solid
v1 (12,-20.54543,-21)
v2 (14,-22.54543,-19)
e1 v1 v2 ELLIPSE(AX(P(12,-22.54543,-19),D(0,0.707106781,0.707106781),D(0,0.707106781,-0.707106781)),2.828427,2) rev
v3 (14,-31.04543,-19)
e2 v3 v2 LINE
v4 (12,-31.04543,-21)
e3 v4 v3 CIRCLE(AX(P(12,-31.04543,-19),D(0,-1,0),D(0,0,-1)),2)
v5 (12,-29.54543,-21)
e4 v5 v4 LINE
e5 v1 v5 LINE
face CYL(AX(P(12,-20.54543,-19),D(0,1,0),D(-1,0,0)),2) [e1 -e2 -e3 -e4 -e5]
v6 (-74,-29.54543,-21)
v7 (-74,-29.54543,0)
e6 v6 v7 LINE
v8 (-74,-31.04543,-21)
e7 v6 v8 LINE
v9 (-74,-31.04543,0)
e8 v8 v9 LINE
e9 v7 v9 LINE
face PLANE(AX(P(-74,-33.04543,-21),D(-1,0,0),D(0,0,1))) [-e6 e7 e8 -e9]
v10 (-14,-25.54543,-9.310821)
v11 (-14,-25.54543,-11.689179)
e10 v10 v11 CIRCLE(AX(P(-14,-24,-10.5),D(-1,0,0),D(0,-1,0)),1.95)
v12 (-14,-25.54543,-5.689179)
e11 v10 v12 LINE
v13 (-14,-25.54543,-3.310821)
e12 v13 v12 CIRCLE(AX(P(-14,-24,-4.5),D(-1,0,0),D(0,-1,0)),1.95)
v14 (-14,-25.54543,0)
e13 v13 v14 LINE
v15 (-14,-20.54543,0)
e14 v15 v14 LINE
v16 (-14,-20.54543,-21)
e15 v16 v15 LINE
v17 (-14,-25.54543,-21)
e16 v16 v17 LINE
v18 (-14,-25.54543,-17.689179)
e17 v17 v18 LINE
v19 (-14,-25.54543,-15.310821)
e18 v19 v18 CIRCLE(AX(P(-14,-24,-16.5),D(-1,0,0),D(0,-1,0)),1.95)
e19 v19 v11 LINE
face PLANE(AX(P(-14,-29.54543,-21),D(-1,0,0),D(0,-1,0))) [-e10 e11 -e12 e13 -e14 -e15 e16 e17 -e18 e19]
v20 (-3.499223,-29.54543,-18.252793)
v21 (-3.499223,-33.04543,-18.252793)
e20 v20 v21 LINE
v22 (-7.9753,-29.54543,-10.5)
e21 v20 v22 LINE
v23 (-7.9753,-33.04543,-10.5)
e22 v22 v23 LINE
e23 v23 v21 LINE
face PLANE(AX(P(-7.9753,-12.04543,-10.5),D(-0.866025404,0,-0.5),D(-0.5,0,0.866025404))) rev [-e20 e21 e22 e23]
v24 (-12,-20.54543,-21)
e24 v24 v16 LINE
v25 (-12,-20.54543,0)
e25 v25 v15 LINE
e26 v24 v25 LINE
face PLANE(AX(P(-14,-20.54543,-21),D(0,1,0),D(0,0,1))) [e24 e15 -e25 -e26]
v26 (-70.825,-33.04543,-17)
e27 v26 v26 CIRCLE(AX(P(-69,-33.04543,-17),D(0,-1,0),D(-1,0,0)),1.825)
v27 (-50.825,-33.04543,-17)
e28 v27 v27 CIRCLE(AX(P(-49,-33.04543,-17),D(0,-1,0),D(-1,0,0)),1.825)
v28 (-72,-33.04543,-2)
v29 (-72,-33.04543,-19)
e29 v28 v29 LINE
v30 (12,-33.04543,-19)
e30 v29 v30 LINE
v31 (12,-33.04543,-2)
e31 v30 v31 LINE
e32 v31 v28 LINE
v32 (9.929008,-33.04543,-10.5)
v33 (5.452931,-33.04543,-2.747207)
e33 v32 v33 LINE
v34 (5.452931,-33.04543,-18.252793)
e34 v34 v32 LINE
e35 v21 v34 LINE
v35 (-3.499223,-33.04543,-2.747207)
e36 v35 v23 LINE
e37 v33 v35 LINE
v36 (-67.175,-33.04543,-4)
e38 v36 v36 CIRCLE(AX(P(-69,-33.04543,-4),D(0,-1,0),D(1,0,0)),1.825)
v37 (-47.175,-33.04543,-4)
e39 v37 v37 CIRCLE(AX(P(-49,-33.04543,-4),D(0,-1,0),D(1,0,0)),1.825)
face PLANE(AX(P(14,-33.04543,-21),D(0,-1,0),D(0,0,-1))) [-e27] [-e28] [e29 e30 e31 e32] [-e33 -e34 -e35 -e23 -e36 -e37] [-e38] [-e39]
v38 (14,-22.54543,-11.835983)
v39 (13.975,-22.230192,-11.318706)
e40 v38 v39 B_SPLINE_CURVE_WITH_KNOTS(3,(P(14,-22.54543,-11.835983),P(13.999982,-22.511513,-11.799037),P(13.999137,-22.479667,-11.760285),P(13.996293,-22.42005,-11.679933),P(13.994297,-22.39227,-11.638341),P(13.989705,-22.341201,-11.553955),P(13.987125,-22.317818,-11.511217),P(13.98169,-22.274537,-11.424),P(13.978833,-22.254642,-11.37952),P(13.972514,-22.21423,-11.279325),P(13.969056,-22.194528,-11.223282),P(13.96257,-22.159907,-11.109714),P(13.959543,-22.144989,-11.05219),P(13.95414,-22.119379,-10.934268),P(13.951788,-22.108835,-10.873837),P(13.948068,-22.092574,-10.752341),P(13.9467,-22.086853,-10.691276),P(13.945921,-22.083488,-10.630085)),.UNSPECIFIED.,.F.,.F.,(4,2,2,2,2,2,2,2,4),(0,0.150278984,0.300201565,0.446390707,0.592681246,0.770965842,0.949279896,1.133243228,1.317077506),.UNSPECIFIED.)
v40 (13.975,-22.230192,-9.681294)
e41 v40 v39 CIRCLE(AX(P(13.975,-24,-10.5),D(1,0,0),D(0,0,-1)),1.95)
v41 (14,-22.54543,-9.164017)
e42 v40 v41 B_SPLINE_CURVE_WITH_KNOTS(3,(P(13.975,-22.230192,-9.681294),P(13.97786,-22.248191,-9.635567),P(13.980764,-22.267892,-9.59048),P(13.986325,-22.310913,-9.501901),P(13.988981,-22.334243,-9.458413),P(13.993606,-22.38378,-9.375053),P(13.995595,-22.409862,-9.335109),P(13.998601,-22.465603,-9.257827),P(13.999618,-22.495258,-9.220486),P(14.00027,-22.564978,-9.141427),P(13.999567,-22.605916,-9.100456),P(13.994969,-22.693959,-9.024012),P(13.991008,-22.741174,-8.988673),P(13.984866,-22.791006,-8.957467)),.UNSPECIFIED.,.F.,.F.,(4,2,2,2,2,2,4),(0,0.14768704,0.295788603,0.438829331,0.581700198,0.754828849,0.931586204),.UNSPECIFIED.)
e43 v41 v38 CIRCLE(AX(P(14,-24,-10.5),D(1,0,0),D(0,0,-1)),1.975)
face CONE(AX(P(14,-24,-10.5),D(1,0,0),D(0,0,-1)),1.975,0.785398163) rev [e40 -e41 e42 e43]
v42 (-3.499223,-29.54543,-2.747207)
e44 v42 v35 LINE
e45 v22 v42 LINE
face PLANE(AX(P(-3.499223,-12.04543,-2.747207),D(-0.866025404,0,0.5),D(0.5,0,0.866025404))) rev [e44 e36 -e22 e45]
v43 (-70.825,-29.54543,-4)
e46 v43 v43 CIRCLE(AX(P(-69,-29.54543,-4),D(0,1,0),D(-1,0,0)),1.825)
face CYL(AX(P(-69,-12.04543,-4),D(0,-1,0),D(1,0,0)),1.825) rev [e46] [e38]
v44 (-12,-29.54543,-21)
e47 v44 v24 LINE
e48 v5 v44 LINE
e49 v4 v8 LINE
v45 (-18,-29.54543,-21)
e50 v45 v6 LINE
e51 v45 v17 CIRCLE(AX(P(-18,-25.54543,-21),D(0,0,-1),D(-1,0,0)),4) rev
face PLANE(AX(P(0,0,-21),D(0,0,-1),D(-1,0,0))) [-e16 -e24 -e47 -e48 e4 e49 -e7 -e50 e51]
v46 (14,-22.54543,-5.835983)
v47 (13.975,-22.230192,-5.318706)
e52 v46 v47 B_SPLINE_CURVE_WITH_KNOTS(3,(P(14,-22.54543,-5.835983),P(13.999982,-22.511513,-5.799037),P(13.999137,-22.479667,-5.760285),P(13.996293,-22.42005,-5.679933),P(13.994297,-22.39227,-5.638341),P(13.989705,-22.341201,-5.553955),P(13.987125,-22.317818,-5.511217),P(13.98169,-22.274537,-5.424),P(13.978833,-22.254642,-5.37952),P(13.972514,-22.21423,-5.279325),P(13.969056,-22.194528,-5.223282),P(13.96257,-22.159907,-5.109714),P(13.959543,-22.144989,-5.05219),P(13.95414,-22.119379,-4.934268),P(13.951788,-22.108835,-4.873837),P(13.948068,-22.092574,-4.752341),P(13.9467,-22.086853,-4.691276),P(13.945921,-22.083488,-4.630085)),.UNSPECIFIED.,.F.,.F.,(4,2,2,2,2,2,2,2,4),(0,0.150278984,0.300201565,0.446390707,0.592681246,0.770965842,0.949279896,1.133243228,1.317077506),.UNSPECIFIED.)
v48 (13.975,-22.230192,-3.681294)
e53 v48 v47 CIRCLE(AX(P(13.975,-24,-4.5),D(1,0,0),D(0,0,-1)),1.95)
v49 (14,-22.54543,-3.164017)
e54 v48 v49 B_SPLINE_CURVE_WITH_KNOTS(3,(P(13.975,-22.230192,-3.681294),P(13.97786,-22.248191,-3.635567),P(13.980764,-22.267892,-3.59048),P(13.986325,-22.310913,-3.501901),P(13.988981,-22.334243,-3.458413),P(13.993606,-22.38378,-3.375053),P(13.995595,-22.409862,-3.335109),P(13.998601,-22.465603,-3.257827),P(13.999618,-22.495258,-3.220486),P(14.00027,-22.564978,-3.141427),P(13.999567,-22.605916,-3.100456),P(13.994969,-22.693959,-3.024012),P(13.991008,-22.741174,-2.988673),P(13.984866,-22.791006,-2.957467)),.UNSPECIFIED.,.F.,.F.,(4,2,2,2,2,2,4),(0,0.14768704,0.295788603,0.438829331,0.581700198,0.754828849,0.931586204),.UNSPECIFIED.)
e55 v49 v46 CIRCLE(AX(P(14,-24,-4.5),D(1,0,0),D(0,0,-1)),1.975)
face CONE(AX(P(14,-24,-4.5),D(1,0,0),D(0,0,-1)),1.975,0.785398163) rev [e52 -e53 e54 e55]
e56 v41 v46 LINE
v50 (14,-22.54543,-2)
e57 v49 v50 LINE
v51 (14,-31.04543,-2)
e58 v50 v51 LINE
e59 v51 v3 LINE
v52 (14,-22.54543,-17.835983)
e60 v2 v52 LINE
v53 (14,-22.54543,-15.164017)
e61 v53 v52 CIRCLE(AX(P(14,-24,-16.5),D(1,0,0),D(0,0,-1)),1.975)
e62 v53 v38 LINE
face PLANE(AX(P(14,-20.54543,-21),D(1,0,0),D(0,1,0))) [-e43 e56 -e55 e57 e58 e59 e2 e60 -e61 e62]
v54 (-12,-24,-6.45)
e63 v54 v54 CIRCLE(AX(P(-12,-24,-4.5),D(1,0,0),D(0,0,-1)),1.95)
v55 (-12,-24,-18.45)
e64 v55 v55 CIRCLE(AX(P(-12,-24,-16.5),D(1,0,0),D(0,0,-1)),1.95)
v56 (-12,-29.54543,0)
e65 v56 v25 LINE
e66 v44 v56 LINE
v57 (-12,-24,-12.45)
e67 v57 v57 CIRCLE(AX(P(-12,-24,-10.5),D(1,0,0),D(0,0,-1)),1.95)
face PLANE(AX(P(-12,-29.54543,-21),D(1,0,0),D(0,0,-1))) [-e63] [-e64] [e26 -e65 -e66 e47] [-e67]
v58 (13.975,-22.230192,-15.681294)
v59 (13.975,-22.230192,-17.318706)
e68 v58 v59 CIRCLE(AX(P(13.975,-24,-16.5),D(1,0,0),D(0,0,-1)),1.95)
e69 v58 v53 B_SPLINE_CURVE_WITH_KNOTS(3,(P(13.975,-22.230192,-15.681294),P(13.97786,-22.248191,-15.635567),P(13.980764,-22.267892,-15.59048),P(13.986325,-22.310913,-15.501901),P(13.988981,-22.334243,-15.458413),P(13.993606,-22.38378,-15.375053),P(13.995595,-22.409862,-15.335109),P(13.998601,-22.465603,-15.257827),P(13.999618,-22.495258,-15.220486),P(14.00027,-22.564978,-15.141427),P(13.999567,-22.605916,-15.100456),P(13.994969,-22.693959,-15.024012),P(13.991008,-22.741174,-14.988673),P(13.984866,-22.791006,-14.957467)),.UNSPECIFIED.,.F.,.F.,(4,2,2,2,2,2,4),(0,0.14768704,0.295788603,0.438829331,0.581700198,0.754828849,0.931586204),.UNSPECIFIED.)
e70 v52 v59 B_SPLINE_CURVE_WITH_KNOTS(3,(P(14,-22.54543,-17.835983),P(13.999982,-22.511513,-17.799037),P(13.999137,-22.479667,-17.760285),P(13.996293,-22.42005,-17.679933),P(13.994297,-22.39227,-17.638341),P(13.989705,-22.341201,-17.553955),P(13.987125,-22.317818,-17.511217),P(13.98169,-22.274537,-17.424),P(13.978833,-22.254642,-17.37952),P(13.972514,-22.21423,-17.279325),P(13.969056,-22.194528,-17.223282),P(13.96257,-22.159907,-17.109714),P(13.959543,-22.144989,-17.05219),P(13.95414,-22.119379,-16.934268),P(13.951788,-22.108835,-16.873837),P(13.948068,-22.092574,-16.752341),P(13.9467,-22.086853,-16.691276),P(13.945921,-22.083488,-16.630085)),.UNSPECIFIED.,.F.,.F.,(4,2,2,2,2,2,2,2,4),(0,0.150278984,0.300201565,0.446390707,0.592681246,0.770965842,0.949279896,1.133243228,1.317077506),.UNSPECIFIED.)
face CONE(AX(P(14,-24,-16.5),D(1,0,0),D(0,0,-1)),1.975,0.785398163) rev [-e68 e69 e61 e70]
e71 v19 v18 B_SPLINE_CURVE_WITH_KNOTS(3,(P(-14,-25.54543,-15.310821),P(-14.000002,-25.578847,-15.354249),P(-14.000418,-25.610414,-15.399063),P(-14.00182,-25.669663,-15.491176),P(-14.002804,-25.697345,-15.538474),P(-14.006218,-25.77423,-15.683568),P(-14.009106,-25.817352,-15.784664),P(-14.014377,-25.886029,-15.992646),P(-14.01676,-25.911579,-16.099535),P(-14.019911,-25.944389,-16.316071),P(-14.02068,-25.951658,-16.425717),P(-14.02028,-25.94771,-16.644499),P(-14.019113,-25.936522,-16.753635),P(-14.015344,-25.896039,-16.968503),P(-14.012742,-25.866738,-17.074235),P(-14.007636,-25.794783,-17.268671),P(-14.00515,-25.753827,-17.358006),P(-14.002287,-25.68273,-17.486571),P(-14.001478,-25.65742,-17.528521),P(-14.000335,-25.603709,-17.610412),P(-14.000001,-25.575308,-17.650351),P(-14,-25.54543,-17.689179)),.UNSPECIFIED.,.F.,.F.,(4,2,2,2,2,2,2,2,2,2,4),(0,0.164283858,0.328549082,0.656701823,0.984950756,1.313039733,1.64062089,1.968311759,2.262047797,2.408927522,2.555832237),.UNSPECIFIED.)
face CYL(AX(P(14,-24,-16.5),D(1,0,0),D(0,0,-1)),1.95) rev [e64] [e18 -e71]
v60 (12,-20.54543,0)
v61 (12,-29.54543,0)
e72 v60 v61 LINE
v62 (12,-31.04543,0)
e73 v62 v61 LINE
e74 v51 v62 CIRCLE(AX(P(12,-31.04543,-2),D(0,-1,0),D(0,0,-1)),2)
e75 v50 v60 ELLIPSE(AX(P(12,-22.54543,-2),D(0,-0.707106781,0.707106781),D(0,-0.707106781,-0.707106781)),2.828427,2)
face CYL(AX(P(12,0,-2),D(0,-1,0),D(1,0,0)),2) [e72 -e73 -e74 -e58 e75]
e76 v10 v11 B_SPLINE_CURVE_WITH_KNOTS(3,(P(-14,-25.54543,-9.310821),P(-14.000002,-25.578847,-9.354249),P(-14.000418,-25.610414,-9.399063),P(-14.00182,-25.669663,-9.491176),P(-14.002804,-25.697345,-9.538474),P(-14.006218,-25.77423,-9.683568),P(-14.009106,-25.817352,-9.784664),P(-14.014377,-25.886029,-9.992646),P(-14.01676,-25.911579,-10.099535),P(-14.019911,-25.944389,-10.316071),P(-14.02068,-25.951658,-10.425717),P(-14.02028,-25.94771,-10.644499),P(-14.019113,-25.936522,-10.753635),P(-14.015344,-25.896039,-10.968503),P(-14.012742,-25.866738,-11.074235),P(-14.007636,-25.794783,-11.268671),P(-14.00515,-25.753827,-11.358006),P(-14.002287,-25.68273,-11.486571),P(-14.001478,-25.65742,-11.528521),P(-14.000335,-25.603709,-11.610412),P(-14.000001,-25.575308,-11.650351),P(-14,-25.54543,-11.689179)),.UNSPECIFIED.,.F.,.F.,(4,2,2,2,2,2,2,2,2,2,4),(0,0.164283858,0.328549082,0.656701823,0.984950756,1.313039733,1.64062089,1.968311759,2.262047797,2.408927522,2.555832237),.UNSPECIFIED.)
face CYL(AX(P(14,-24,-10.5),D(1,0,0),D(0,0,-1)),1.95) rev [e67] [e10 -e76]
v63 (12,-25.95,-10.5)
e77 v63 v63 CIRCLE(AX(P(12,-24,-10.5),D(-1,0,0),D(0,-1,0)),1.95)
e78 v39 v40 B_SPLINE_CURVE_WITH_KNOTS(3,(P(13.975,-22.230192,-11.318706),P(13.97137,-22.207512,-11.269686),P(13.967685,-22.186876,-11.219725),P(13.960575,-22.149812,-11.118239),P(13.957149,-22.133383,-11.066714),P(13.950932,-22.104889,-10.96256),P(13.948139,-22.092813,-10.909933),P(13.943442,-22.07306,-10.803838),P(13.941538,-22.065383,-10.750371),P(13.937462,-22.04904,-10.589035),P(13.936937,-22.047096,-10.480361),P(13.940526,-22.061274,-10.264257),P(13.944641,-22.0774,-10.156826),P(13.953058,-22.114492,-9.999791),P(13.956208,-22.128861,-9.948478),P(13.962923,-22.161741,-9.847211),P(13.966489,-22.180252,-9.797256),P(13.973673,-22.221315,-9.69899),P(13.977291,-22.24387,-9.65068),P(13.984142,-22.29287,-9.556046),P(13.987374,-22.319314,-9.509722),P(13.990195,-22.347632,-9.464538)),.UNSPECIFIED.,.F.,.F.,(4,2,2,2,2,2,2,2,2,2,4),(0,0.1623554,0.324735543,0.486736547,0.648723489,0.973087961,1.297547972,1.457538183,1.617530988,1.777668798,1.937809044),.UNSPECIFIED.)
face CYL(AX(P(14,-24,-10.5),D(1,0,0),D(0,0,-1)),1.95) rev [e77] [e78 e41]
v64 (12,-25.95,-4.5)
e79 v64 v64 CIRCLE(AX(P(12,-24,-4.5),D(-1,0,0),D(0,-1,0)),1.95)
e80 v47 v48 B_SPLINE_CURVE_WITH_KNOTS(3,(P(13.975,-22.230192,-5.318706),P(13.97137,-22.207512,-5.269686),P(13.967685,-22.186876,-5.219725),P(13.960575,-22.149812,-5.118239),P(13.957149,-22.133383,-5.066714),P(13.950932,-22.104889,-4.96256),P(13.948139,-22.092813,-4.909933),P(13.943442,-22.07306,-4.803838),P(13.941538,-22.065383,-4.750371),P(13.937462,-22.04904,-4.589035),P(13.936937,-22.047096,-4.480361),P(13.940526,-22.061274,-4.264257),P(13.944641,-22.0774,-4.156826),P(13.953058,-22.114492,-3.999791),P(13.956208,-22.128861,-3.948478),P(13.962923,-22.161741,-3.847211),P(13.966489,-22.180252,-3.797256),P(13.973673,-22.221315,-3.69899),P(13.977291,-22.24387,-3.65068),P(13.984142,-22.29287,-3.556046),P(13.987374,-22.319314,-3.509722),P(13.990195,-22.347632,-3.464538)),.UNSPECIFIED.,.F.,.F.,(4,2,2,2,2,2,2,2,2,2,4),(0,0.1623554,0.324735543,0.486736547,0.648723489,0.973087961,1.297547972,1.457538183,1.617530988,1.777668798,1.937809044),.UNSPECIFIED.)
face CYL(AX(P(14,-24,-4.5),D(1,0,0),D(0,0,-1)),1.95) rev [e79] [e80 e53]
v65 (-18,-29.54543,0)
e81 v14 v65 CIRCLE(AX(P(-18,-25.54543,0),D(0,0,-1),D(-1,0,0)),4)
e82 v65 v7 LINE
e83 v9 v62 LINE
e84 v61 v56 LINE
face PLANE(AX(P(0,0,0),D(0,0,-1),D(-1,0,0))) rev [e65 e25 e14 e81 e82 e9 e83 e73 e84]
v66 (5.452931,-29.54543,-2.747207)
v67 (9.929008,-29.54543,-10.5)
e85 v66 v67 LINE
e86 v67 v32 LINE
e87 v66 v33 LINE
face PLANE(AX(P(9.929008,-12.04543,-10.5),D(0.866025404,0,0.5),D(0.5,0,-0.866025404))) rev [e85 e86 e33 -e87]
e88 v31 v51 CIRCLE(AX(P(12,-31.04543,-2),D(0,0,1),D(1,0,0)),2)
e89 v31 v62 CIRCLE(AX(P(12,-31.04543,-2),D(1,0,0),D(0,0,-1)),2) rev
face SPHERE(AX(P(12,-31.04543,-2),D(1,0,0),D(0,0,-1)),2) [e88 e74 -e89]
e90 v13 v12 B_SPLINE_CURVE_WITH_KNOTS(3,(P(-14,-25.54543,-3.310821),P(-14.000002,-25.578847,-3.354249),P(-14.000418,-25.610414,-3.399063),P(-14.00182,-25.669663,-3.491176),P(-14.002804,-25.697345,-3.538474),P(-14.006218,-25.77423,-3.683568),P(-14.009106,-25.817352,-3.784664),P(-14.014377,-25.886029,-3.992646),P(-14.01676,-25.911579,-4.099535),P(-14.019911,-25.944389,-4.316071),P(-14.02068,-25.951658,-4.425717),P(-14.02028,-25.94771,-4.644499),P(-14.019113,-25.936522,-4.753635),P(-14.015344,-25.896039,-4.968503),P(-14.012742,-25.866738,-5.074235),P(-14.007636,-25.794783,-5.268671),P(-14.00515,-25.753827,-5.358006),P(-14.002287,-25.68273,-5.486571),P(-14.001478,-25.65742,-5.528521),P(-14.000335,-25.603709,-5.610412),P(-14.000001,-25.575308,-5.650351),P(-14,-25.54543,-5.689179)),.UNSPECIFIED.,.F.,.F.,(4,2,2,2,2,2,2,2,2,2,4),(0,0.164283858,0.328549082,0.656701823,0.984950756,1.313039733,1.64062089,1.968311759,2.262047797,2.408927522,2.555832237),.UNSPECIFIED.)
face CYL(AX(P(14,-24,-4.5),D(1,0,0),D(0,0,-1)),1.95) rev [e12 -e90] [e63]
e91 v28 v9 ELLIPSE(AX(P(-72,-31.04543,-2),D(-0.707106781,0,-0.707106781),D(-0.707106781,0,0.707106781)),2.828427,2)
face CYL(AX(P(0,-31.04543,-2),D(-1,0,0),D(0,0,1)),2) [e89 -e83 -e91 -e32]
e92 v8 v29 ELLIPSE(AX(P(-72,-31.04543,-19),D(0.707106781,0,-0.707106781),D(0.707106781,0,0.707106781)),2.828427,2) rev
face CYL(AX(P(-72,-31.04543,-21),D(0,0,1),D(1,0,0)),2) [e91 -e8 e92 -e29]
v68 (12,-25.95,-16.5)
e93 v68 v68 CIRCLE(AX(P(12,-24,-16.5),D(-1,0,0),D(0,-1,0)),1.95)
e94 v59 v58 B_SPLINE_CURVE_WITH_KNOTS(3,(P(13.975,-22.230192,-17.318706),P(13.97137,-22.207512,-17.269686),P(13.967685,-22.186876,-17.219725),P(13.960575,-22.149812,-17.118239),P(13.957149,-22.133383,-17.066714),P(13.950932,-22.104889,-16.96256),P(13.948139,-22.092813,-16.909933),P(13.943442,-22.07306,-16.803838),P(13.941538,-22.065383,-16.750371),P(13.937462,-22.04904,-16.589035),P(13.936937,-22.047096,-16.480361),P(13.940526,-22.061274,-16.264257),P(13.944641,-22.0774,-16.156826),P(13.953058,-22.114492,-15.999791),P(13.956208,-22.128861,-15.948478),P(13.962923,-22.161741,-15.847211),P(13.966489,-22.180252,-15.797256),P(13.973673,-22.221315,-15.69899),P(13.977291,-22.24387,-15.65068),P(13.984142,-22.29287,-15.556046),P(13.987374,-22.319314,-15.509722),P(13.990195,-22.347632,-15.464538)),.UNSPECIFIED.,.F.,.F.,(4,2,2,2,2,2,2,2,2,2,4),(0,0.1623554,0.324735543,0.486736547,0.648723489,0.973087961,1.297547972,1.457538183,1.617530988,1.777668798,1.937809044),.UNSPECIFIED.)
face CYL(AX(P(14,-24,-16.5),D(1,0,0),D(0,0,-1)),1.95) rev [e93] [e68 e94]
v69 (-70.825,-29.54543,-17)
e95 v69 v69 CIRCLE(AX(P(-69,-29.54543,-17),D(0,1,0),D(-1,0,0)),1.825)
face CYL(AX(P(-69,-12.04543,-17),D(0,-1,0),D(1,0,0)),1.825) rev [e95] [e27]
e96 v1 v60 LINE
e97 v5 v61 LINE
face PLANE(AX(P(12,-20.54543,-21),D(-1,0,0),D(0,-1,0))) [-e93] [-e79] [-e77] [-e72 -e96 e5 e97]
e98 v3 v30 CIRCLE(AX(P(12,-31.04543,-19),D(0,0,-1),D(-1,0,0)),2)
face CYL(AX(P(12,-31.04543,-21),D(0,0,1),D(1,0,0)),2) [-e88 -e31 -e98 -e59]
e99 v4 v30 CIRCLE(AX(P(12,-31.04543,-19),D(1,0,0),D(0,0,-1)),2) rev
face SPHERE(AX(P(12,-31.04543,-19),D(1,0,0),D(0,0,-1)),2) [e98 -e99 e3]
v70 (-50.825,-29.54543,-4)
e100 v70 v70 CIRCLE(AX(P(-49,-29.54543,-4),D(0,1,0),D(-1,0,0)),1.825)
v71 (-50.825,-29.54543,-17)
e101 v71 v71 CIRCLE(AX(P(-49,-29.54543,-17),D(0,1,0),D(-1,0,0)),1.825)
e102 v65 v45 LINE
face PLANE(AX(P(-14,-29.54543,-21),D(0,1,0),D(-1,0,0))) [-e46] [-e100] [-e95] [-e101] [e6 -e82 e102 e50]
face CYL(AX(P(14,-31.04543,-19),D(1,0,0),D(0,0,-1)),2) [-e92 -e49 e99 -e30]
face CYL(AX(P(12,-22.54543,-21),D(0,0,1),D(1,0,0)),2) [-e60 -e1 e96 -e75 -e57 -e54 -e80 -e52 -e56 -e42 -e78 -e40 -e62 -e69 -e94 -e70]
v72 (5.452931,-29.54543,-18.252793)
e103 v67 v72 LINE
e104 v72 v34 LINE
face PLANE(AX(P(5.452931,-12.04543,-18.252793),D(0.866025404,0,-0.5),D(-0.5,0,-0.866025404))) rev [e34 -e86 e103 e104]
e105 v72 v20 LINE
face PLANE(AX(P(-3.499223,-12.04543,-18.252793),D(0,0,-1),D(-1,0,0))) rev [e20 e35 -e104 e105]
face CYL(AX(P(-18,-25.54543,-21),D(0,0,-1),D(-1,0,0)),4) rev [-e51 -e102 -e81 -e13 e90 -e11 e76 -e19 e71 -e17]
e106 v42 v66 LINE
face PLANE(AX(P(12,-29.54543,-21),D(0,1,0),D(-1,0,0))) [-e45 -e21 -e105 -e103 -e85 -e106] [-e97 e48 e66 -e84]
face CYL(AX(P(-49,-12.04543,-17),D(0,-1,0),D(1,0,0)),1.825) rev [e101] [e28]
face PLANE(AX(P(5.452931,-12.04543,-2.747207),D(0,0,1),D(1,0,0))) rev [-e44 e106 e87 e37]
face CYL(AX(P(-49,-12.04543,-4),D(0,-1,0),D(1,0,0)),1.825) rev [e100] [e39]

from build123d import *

# Parameters (mm, degrees)
BOSS_EXTRUDE1_DEPTH              = 21
FILLET1_R                        = 4
M3_5_CLEARANCE_HOLE1_D           = 3.9
M3_5_CLEARANCE_HOLE1_CSINK_D     = 3.95
M3_5_CLEARANCE_HOLE1_CSINK_ANGLE = 90
SKETCH4_R                        = 1.825
CUT_EXTRUDE1_DEPTH               = 21
FILLET3_R                        = 2


with BuildPart() as part:
    # Sketch1 → Boss-Extrude1 (new body)
    with BuildSketch(Plane.XY):
        Polygon((12, -20.545429918), (14, -20.545429918), (14, -33.045429918), (-74, -33.045429918), (-74, -29.545429918), (-14, -29.545429918), (-14, -20.545429918), (-12, -20.545429918), (-12, -29.545429918), (12, -29.545429918), align=None)
    extrude(amount=-BOSS_EXTRUDE1_DEPTH)

    # Fillet1
    fillet1_edges = [part.edges().sort_by_distance(p)[0] for p in [
        (-14, -29.545429918, -10.5),
    ]]
    fillet(fillet1_edges, radius=FILLET1_R)

    # M3.5 Clearance Hole1 (through all)
    with Locations(Plane(origin=(14, 0, 0), x_dir=(0, 0, -1), z_dir=(1, 0, 0))):
        with Locations((4.5, -24), (10.5, -24), (16.5, -24)):
            CounterSinkHole(M3_5_CLEARANCE_HOLE1_D / 2, M3_5_CLEARANCE_HOLE1_CSINK_D / 2, counter_sink_angle=M3_5_CLEARANCE_HOLE1_CSINK_ANGLE)

    # Sketch4 → Cut-Extrude1 (cut)
    with BuildSketch(Plane.XZ.offset(33.045429918)):
        with Locations((-69, -4)):
            Circle(SKETCH4_R)
        with Locations((-49, -4)):
            Circle(SKETCH4_R)
        with Locations((18.166214484, -42.778432013)):
            Circle(SKETCH4_R)
        with Locations((28.166214484, -60.098940088)):
            Circle(SKETCH4_R)
        with Locations(Location((-69, -17, 0), (0, 0, 180))):
            Circle(SKETCH4_R)
        with Locations(Location((-49, -17, 0), (0, 0, 180))):
            Circle(SKETCH4_R)
        Polygon((-3.49922334, -18.252792933), (5.452930834, -18.252792933), (9.929007921, -10.5), (5.452930834, -2.747207067), (-3.49922334, -2.747207067), (-7.975300427, -10.5), align=None)
    extrude(amount=-CUT_EXTRUDE1_DEPTH, mode=Mode.SUBTRACT)

    # Fillet3
    # the kernel refuses this fillet: 2 mm, written as the material it takes off along each edge
    with BuildSketch(Plane(origin=(12, -31.045429918, -19), x_dir=(0, 0, -1), z_dir=(0, -1, 0))) as fillet3_piece_1_section:
        Polygon((0, 0), (FILLET3_R, 0), (FILLET3_R, FILLET3_R), (0, FILLET3_R), align=None)
    fillet3_piece_1 = extrude(amount=FILLET3_R, mode=Mode.PRIVATE)
    fillet3_piece_1 = fillet3_piece_1 - Plane(origin=(12, -31.045429918, -19), x_dir=(-0.7071067811865475, 0, 0.7071067811865475), z_dir=(0, -1, 0)) * Sphere(FILLET3_R, mode=Mode.PRIVATE)
    add(fillet3_piece_1, mode=Mode.SUBTRACT)
    with BuildSketch(Plane(origin=(12, -31.045429918, -2), x_dir=(0, -1, 0), z_dir=(0, 0, 1))) as fillet3_piece_2_section:
        Polygon((0, 0), (FILLET3_R, 0), (FILLET3_R, FILLET3_R), (0, FILLET3_R), align=None)
    fillet3_piece_2 = extrude(amount=FILLET3_R, mode=Mode.PRIVATE)
    fillet3_piece_2 = fillet3_piece_2 - Plane(origin=(12, -31.045429918, -2), x_dir=(-0.7071067811865476, 0.7071067811865475, 0), z_dir=(0, 0, 1)) * Sphere(FILLET3_R, mode=Mode.PRIVATE)
    add(fillet3_piece_2, mode=Mode.SUBTRACT)
    with BuildSketch(Plane(origin=(-74, -33.045429918, 5), x_dir=(0, 1, 0), z_dir=(0, 0, -1)), Plane(origin=(14, -20.545429918, 5), x_dir=(0, -1, 0), z_dir=(0, 0, -1))) as fillet3_piece_3:
        with BuildLine():
            CenterArc((FILLET3_R, FILLET3_R), FILLET3_R, 180, 90)
            Line((0, FILLET3_R), (0, 0))
            Line((0, 0), (FILLET3_R, 0))
        make_face()
    extrude(amount=31, mode=Mode.SUBTRACT)
    with BuildSketch(Plane(origin=(12, -33.045429918, -21), x_dir=(0, 1, 0), z_dir=(-1, 0, 0))) as fillet3_piece_4:
        with BuildLine():
            CenterArc((FILLET3_R, -FILLET3_R), FILLET3_R, 90, 90)
            Line((0, -FILLET3_R), (0, 0))
            Line((0, 0), (FILLET3_R, 0))
        make_face()
    extrude(amount=91, mode=Mode.SUBTRACT)
    with BuildSketch(Plane(origin=(12, -33.045429918, 0), x_dir=(0, 1, 0), z_dir=(-1, 0, 0))) as fillet3_piece_5:
        with BuildLine():
            CenterArc((FILLET3_R, FILLET3_R), FILLET3_R, 180, 90)
            Line((0, FILLET3_R), (0, 0))
            Line((0, 0), (FILLET3_R, 0))
        make_face()
    extrude(amount=91, mode=Mode.SUBTRACT)
    with BuildSketch(Plane(origin=(14, -15.545429918, -21), x_dir=(-1, 0, 0), z_dir=(0, -1, 0))) as fillet3_piece_6:
        with BuildLine():
            CenterArc((FILLET3_R, -FILLET3_R), FILLET3_R, 90, 90)
            Line((0, -FILLET3_R), (0, 0))
            Line((0, 0), (FILLET3_R, 0))
        make_face()
    extrude(amount=15.5, mode=Mode.SUBTRACT)
    with BuildSketch(Plane(origin=(14, -15.545429918, 0), x_dir=(-1, 0, 0), z_dir=(0, -1, 0))) as fillet3_piece_7:
        with BuildLine():
            CenterArc((FILLET3_R, FILLET3_R), FILLET3_R, 180, 90)
            Line((0, FILLET3_R), (0, 0))
            Line((0, 0), (FILLET3_R, 0))
        make_face()
    extrude(amount=15.5, mode=Mode.SUBTRACT)
    with BuildSketch(Plane(origin=(14, -33.045429918, -2), x_dir=(-1, 0, 0), z_dir=(0, 0, -1))) as fillet3_piece_8:
        with BuildLine():
            CenterArc((FILLET3_R, FILLET3_R), FILLET3_R, 180, 90)
            Line((0, FILLET3_R), (0, 0))
            Line((0, 0), (FILLET3_R, 0))
        make_face()
    extrude(amount=17, mode=Mode.SUBTRACT)


solid = part.part
